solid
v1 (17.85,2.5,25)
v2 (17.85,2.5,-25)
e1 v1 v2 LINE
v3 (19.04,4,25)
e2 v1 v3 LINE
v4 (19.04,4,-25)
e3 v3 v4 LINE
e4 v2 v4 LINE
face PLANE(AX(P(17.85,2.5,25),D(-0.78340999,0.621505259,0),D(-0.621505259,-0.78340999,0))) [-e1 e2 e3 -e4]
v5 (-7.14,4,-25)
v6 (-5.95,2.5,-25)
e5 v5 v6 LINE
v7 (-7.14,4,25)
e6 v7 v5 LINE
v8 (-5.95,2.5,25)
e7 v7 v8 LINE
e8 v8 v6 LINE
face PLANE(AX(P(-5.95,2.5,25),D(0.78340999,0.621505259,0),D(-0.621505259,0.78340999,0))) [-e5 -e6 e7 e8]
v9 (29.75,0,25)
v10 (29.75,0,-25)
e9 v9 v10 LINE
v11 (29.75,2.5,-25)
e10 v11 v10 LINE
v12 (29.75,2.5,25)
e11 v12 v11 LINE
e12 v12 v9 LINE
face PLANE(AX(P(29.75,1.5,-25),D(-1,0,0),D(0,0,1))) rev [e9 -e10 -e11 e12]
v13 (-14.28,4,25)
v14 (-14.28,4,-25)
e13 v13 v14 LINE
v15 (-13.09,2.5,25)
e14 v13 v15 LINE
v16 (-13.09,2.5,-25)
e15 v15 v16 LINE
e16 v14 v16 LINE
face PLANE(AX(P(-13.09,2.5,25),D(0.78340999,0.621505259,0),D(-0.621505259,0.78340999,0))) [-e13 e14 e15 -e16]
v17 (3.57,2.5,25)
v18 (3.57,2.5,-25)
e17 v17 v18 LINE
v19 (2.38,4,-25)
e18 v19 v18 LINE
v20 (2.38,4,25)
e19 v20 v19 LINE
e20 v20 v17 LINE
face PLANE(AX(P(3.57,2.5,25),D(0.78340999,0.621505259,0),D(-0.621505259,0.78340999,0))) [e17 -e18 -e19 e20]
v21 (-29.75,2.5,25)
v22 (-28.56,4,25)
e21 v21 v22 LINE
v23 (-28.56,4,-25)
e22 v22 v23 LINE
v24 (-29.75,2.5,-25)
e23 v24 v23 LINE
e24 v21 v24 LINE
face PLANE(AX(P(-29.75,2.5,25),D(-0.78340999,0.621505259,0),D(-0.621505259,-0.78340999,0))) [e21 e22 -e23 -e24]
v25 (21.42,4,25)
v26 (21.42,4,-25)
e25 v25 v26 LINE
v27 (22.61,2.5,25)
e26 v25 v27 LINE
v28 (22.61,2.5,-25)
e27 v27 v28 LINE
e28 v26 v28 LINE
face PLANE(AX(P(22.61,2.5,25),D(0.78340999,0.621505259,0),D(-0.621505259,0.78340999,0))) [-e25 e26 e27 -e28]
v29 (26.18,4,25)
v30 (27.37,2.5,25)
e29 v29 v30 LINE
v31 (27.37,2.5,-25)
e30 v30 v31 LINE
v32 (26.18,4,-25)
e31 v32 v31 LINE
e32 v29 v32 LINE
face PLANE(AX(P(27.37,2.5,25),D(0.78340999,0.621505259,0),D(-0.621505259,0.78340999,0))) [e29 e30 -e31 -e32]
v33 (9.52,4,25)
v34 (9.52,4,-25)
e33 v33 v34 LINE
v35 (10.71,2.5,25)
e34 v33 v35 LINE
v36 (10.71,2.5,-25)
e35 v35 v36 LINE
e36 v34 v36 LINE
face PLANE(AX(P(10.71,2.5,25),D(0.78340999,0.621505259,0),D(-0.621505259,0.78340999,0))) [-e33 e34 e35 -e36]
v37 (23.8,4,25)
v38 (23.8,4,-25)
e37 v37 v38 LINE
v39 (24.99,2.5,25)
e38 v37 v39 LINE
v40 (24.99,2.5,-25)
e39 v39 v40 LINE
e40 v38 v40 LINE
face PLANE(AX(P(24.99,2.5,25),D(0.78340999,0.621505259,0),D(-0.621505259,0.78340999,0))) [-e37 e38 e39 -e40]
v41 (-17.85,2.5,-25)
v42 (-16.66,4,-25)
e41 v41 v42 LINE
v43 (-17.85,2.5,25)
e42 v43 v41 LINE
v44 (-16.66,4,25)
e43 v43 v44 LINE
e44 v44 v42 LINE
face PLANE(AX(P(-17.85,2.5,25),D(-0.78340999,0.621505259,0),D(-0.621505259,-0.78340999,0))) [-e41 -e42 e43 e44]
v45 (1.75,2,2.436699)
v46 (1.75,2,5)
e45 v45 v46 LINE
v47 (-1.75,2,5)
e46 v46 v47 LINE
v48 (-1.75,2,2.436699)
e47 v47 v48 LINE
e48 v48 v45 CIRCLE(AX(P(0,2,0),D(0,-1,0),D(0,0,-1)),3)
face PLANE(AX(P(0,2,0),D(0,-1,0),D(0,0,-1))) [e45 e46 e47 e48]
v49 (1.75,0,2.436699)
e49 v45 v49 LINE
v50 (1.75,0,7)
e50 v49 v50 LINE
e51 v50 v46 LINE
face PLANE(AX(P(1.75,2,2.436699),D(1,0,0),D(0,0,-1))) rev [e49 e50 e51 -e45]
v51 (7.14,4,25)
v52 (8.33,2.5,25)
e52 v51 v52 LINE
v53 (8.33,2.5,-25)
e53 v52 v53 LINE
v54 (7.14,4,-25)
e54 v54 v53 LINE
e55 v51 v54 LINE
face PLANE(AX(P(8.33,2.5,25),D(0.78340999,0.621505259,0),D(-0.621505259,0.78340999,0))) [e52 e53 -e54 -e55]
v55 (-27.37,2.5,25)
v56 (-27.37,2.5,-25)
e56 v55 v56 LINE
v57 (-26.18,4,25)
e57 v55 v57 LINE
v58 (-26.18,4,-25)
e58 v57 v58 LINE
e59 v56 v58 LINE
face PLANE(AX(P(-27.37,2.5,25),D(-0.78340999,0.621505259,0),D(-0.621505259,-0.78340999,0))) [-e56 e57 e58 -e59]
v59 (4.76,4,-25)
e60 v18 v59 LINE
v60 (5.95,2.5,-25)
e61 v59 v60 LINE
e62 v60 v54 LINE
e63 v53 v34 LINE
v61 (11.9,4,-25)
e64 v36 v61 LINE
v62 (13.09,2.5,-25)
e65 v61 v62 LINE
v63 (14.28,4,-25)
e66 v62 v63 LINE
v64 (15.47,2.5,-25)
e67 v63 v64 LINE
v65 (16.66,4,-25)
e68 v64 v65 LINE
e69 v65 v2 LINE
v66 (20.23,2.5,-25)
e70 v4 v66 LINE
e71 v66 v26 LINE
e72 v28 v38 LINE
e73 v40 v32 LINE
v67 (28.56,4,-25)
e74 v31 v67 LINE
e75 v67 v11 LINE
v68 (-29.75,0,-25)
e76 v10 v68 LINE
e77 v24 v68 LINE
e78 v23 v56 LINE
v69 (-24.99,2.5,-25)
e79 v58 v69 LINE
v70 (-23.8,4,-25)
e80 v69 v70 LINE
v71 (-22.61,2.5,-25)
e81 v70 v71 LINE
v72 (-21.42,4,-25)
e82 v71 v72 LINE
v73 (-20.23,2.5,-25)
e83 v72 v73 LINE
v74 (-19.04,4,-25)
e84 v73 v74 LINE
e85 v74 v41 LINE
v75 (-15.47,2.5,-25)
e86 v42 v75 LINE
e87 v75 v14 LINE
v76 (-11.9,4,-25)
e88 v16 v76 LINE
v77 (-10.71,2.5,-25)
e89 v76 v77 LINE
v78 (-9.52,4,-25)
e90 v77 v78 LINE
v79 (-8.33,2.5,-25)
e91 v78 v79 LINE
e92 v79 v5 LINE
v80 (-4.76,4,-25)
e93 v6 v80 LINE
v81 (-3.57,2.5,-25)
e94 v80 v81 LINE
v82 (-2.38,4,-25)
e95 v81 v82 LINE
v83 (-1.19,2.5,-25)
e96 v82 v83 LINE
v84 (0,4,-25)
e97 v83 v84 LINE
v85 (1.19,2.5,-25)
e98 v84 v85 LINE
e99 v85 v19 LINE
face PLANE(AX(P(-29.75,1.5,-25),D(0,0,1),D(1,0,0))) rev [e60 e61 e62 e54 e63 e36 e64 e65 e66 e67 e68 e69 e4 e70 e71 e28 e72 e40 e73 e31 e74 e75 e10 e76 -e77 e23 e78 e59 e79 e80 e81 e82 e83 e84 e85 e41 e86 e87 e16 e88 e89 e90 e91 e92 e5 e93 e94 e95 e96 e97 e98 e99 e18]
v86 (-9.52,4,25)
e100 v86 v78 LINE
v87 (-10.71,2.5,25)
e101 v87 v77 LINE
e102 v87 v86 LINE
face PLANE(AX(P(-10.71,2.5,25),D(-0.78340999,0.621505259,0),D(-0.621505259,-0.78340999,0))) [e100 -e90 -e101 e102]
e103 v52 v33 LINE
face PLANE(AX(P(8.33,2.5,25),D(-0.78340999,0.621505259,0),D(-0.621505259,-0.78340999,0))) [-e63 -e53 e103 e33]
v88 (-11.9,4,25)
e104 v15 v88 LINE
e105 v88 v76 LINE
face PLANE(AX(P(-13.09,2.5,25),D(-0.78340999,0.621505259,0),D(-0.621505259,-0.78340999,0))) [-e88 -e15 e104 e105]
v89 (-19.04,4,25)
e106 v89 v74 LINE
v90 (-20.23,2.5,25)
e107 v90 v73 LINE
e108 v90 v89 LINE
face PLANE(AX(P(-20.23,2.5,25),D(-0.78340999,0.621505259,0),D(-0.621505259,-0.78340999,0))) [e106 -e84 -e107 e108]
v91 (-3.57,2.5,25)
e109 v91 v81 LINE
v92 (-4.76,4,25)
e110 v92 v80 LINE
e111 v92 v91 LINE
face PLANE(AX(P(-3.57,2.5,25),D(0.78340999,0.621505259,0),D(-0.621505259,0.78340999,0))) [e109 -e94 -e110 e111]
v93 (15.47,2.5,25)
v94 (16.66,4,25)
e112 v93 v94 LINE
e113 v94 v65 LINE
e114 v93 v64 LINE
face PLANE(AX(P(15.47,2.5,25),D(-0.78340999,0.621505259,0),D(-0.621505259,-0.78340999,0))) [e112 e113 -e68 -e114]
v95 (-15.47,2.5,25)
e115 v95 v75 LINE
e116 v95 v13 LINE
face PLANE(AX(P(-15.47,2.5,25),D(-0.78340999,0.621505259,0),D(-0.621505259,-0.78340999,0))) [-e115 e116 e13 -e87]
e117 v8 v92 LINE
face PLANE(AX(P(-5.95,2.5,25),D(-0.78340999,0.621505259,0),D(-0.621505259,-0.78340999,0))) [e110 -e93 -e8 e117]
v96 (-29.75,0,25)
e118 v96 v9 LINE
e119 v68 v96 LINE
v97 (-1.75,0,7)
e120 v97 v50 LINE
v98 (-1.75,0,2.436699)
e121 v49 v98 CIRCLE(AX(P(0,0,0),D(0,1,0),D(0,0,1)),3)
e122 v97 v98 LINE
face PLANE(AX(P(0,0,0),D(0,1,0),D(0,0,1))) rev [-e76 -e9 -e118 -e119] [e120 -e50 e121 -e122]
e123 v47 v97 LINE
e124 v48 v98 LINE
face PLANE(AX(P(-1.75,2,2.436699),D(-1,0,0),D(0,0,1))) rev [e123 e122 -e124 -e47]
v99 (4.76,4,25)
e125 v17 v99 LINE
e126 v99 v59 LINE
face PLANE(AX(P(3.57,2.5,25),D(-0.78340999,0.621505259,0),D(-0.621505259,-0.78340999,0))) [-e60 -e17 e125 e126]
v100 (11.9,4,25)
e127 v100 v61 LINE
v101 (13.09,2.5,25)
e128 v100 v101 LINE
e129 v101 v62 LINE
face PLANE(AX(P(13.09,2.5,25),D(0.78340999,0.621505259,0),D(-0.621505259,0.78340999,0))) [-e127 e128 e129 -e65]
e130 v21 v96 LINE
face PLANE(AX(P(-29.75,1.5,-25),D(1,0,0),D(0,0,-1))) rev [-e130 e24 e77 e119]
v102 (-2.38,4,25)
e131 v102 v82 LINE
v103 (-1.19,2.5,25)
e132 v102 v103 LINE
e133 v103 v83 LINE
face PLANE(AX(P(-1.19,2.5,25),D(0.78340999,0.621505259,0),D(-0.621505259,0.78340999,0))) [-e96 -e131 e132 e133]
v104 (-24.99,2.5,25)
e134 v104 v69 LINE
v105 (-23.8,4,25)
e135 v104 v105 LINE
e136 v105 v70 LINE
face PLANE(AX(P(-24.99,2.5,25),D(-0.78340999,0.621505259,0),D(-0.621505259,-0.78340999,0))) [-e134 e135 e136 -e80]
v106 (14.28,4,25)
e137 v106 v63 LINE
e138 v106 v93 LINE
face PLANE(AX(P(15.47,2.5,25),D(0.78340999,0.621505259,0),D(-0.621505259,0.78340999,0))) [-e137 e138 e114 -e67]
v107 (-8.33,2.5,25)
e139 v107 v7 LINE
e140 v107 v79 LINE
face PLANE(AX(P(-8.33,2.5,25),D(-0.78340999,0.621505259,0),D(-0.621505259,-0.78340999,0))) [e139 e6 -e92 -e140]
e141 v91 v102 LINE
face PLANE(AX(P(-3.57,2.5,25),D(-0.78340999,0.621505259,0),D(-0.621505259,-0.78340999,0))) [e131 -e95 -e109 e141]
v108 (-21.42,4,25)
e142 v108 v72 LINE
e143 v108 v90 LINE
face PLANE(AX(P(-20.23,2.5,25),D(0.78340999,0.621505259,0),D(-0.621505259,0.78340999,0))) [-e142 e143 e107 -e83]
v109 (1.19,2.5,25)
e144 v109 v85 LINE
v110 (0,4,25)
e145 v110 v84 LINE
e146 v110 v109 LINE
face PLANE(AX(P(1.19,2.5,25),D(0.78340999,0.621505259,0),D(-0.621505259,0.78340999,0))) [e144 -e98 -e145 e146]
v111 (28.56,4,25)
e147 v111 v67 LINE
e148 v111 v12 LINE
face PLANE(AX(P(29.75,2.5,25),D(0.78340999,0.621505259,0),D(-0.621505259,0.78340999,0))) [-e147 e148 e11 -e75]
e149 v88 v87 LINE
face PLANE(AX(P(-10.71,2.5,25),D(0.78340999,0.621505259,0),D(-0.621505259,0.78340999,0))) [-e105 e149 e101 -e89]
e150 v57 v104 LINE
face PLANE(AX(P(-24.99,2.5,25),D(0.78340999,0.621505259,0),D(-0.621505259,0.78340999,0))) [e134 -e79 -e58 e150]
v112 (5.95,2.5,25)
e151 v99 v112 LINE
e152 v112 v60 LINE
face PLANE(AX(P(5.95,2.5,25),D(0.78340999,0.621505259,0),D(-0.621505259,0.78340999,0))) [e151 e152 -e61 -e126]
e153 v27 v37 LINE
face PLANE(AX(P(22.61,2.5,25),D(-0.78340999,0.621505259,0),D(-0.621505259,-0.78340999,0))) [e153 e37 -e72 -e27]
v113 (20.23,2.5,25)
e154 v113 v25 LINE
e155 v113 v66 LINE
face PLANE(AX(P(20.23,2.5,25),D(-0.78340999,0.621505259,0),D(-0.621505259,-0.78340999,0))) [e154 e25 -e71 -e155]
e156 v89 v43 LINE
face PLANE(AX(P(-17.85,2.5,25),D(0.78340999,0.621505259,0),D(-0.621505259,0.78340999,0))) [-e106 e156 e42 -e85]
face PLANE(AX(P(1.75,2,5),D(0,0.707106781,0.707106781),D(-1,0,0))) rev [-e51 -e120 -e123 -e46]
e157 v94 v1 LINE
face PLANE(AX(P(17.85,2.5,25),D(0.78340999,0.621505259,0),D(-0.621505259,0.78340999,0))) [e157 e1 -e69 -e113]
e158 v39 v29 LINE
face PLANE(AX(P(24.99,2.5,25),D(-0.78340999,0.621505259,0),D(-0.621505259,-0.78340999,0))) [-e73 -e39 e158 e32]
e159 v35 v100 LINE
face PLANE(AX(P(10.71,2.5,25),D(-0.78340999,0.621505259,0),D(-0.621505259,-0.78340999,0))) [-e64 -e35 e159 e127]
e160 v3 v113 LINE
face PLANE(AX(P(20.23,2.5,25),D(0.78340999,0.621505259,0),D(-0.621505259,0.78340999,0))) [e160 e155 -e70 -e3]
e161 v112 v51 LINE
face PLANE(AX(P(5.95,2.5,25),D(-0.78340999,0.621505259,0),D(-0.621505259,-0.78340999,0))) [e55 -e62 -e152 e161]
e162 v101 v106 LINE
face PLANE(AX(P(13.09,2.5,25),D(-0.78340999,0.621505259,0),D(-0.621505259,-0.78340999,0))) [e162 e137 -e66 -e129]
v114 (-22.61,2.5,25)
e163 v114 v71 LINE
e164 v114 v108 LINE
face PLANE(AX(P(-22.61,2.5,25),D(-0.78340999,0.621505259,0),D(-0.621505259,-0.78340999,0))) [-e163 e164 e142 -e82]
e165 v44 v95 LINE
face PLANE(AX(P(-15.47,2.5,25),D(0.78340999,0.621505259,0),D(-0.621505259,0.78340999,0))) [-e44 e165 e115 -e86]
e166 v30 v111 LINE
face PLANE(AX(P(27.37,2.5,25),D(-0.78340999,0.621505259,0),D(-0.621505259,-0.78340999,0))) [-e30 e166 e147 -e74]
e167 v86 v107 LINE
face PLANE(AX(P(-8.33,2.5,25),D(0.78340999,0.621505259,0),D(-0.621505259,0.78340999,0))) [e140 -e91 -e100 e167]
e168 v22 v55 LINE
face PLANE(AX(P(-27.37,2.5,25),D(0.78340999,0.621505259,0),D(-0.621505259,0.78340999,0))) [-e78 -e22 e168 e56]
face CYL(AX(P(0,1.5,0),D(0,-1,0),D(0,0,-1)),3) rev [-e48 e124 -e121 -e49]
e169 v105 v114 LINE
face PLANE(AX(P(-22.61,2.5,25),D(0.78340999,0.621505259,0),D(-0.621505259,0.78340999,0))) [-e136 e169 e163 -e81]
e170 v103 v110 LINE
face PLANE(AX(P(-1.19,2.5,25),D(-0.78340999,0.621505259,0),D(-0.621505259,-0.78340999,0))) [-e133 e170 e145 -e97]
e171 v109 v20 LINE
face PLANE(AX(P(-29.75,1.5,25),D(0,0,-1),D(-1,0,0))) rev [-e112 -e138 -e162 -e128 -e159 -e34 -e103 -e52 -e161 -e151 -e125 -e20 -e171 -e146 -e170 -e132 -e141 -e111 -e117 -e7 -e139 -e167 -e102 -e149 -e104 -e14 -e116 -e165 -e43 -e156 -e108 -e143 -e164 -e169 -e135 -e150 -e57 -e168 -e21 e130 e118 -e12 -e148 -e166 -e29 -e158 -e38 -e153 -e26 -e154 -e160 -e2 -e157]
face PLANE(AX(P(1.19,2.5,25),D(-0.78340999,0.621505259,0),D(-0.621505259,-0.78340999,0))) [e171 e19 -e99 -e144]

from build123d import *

# Parameters (mm, degrees)
SKETCH1_W           = 59.5
SKETCH1_H           = 50
SKETCH1_R           = 3
BOSS_EXTRUDE1_DEPTH = 1.5
BOSS_EXTRUDE2_DEPTH = 50
CUT_EXTRUDE1_DEPTH  = 2
CHAMFER1_SIZE       = 2


with BuildPart() as part:
    # Sketch1 → Boss-Extrude1 (new body)
    with BuildSketch(Plane(origin=(0, 0, 0), x_dir=(1, 0, 0), z_dir=(0, 1, 0))):
        Rectangle(SKETCH1_W, SKETCH1_H)
        with Locations(Location((0, 0, 0), (0, 0, 270))):
            Circle(SKETCH1_R, mode=Mode.SUBTRACT)
    extrude(amount=BOSS_EXTRUDE1_DEPTH)

    # Sketch2 → Boss-Extrude2 (add)
    with BuildSketch(Plane(origin=(0, 0, -25), x_dir=(-1, 0, 0), z_dir=(0, 0, -1))):
        Polygon((-29.75, 1.5), (29.75, 1.5), (29.75, 2.5), (28.56, 4), (27.37, 2.5), (26.18, 4), (24.99, 2.5), (23.8, 4), (22.61, 2.5), (21.42, 4), (20.23, 2.5), (19.04, 4), (17.85, 2.5), (16.66, 4), (15.47, 2.5), (14.28, 4), (13.09, 2.5), (11.9, 4), (10.71, 2.5), (9.52, 4), (8.33, 2.5), (7.14, 4), (5.95, 2.5), (4.76, 4), (3.57, 2.5), (2.38, 4), (1.19, 2.5), (0, 4), (-1.19, 2.5), (-2.38, 4), (-3.57, 2.5), (-4.76, 4), (-5.95, 2.5), (-7.14, 4), (-8.33, 2.5), (-9.52, 4), (-10.71, 2.5), (-11.9, 4), (-13.09, 2.5), (-14.28, 4), (-15.47, 2.5), (-16.66, 4), (-17.85, 2.5), (-19.04, 4), (-20.23, 2.5), (-21.42, 4), (-22.61, 2.5), (-23.8, 4), (-24.99, 2.5), (-26.18, 4), (-27.37, 2.5), (-28.56, 4), (-29.75, 2.5), align=None)
    extrude(amount=-BOSS_EXTRUDE2_DEPTH)

    # Sketch3 → Cut-Extrude1 (cut)
    with BuildSketch(Plane(origin=(0, 0, 0), x_dir=(-1, 0, 0), z_dir=(0, -1, 0))):
        with BuildLine():
            Line((-1.75, -2.436698586), (-1.75, -5))
            Line((-1.75, -5), (1.75, -5))
            Line((1.75, -5), (1.75, -2.436698586))
            ThreePointArc((1.75, -2.436698586), (0, 3), (-1.75, -2.436698586))
        make_face()
    extrude(amount=-CUT_EXTRUDE1_DEPTH, mode=Mode.SUBTRACT)

    # Chamfer1
    chamfer1_edges = [part.edges().sort_by_distance(p)[0] for p in [
        (0, 0, 5),
    ]]
    chamfer(chamfer1_edges, length=CHAMFER1_SIZE - 0.0001)  # a hair under: the kernel refuses the full size


solid = part.part
